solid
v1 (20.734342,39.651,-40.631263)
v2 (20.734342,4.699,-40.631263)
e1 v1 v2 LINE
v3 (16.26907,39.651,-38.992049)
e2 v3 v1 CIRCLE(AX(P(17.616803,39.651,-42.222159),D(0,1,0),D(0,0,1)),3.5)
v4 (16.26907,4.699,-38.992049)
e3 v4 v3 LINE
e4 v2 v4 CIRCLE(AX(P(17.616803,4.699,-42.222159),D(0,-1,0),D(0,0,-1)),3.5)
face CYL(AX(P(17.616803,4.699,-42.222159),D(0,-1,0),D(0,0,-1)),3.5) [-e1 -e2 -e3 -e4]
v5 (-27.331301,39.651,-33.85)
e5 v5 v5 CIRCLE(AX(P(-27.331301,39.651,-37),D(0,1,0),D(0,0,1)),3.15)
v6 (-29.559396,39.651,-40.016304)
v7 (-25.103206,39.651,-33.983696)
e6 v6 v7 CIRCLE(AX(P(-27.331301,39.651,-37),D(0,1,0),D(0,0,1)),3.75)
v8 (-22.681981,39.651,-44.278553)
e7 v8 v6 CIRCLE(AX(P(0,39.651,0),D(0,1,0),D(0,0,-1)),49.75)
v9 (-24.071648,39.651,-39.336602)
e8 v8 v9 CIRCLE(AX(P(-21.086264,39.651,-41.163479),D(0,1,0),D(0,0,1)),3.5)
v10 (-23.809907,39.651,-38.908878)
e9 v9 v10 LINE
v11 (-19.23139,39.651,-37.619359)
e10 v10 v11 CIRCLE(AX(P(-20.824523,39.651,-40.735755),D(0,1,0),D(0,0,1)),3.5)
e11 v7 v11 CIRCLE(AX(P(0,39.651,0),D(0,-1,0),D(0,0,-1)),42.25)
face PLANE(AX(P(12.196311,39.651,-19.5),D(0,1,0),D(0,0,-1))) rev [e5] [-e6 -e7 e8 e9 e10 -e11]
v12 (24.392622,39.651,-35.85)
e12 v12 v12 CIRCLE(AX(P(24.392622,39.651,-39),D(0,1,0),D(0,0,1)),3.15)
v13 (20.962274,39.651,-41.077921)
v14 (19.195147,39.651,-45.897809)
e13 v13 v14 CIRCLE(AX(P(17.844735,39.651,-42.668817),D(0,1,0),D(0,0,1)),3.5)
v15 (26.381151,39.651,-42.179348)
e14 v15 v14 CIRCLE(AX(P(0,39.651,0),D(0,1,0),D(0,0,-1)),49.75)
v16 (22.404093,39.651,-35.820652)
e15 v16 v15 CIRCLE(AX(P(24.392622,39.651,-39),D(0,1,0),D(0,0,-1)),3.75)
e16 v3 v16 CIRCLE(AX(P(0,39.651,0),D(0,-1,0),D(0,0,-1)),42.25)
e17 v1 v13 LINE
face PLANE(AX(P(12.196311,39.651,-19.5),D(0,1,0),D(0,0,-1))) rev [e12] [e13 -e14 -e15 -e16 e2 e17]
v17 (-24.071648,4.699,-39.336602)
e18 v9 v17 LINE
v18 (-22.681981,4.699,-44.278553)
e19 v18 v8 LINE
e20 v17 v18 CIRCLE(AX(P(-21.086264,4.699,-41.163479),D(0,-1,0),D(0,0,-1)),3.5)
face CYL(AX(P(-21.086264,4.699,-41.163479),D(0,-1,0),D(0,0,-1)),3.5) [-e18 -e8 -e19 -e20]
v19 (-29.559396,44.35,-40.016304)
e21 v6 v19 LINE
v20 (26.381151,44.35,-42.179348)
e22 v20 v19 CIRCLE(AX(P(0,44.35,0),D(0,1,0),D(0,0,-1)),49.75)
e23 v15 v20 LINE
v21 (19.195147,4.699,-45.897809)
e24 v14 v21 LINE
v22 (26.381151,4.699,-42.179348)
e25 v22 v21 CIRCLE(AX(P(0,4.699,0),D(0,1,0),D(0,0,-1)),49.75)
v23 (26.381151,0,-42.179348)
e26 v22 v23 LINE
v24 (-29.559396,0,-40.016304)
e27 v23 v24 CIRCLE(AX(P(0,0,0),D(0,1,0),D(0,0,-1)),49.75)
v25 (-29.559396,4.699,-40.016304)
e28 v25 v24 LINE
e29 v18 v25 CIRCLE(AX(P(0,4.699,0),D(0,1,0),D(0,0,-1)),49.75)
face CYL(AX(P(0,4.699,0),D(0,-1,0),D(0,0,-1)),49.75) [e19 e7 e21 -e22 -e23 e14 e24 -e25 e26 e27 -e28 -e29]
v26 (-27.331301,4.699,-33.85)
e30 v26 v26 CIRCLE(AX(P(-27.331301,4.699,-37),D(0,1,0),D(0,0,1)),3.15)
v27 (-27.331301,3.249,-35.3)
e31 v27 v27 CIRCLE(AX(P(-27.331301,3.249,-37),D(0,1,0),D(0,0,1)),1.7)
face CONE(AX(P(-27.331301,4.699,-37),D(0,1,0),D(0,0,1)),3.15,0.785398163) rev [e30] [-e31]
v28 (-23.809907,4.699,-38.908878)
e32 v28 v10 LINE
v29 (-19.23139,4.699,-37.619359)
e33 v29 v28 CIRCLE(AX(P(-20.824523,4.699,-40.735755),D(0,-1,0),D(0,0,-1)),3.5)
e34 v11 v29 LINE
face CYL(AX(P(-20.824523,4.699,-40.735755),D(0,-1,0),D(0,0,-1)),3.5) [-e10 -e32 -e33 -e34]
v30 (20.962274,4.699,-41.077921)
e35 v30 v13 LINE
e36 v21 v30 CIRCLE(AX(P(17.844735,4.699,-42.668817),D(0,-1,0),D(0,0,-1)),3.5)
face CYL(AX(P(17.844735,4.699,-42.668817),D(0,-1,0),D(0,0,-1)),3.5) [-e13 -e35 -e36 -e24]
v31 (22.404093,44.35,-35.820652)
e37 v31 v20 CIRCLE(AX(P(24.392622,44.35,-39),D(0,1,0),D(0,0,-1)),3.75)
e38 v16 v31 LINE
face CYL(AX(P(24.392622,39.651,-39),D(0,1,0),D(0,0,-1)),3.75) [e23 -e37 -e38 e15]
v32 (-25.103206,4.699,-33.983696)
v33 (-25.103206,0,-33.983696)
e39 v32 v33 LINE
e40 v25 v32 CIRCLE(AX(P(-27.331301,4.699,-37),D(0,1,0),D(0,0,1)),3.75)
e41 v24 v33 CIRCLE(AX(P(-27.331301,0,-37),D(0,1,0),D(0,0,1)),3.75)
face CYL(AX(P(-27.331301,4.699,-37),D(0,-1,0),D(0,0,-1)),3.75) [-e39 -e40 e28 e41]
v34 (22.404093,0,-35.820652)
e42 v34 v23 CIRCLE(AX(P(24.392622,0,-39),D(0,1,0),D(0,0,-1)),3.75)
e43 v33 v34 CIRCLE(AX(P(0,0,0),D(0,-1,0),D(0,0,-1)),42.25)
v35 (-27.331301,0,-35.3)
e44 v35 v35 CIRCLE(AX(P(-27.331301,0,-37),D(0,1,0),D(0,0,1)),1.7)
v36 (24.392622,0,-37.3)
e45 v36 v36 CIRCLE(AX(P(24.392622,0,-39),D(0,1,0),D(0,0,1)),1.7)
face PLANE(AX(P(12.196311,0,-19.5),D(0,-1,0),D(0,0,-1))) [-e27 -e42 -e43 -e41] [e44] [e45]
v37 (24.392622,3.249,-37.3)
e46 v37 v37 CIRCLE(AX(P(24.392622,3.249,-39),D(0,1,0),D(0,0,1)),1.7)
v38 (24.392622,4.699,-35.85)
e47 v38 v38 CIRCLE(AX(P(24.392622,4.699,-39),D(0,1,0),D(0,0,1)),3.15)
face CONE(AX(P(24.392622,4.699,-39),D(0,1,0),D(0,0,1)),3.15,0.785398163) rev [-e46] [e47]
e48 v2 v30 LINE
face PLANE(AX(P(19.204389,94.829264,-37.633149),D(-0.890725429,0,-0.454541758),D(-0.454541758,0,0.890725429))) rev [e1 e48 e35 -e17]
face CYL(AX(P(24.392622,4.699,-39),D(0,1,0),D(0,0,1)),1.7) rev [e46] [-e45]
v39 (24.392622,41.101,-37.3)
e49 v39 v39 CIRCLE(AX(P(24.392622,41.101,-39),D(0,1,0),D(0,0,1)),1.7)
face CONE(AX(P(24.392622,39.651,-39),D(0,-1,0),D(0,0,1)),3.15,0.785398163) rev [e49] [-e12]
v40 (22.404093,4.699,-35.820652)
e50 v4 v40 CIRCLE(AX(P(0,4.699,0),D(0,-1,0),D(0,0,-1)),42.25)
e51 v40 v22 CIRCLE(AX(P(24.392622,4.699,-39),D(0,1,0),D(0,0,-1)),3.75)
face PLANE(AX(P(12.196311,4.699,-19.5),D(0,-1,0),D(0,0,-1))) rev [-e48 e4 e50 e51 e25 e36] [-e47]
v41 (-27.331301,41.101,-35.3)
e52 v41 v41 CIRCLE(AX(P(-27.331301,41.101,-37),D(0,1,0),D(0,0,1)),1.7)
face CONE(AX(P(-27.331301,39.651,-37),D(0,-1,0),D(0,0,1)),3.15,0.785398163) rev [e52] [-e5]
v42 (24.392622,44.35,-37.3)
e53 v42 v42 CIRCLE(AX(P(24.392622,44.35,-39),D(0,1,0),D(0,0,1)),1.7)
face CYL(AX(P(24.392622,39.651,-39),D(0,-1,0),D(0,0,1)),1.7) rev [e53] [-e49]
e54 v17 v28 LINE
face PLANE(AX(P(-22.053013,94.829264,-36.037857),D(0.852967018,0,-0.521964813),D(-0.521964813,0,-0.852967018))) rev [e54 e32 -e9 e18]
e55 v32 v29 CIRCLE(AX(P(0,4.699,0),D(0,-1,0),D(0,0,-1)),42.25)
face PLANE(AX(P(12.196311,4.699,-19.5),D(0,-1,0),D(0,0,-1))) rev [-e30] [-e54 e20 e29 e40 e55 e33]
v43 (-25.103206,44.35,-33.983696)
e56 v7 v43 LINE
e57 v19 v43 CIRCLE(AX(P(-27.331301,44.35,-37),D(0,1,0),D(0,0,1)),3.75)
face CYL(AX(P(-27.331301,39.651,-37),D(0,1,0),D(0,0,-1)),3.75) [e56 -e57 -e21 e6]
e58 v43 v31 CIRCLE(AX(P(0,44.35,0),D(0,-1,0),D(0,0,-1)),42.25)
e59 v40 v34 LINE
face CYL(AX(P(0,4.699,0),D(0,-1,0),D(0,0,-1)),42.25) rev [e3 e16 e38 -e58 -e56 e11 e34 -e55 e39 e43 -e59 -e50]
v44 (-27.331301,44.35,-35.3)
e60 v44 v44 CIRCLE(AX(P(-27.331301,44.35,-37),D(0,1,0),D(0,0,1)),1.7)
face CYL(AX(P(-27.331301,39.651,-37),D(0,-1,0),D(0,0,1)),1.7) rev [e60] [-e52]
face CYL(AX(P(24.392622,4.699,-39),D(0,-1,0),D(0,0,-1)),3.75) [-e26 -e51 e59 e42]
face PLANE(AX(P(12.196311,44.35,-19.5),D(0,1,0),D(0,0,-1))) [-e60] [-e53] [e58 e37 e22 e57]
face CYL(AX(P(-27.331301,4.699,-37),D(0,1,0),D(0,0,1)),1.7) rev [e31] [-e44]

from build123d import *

# Parameters (mm, degrees)
BOSS_EXTRUDE1_DEPTH                             = 4.699
CSK_FOR_M3_FLAT_HEAD_MACHINE_SCREW1_D           = 3.4
CSK_FOR_M3_FLAT_HEAD_MACHINE_SCREW1_CSINK_D     = 6.3
CSK_FOR_M3_FLAT_HEAD_MACHINE_SCREW1_CSINK_ANGLE = 90
BOSS_EXTRUDE2_DEPTH                             = 17.476
FILLET1_R                                       = 3.5


# Read off the part's stored shape, not the designer's step: Mirror1
with BuildPart() as part:
    # Sketch1 → Boss-Extrude1 (new body)
    with BuildSketch(Plane(origin=(0, 0, 0), x_dir=(1, 0, 0), z_dir=(0, 1, 0))):
        with BuildLine():
            ThreePointArc((-29.559395906245367, 40.016304347826086), (-1.9222382209583215, 49.71285045359888), (26.381150789265686, 42.17934782608695))
            ThreePointArc((26.381150789265686, 42.17934782608695), (27.57196966138789, 37.011471046035254), (22.404092881336187, 35.82065217391305))
            ThreePointArc((22.404092881336187, 35.82065217391305), (-1.6324535645324438, 42.21845088772971), (-25.10320556862043, 33.983695652173914))
            ThreePointArc((-25.10320556862043, 33.983695652173914), (-30.347605085258984, 34.771904831187534), (-29.559395906245367, 40.016304347826086))
        make_face()
    extrude(amount=BOSS_EXTRUDE1_DEPTH)

    # CSK for M3 Flat Head Machine Screw1 (through all)
    with Locations(Plane(origin=(0, 4.699, 0), x_dir=(1, 0, 0), z_dir=(0, 1, 0))):
        with Locations((-27.331300737, 37), (24.392621835, 39)):
            CounterSinkHole(CSK_FOR_M3_FLAT_HEAD_MACHINE_SCREW1_D / 2, CSK_FOR_M3_FLAT_HEAD_MACHINE_SCREW1_CSINK_D / 2, counter_sink_angle=CSK_FOR_M3_FLAT_HEAD_MACHINE_SCREW1_CSINK_ANGLE)

    # Sketch4 → Boss-Extrude2 (add)
    with BuildSketch(Plane(origin=(0, 4.699, 0), x_dir=(1, 0, 0), z_dir=(0, 1, 0))):
        with BuildLine():
            Line((-22.05301335725447, 36.037856510408), (-25.967749456175376, 42.43510914539167))
            ThreePointArc((-25.967749456175376, 42.43510914539167), (-1.9222382209583215, 49.71285045359888), (22.613452452482438, 44.31359010709148))
            Line((22.613452452482438, 44.31359010709148), (19.204389268691116, 37.633149387429455))
            ThreePointArc((19.204389268691116, 37.633149387429455), (-1.6324535645324438, 42.21845088772971), (-22.05301335725447, 36.037856510408))
        make_face()
    extrude(amount=BOSS_EXTRUDE2_DEPTH)

    # Mirror1: part across plane


with BuildPart() as part_1:
    add(part.part)
    add(part.part.mirror(Plane(origin=(12.196310917650468, 22.175, -19.5), x_dir=(0, 0, 1), z_dir=(0, -1, 0))))

    # Fillet1
    fillet1_edges = [part_1.edges().sort_by_distance(p)[0] for p in [
        (19.204389268691116, 22.175000000000004, -37.633149387429455),
        (-22.053013357254475, 22.175, -36.037856510408005),
        (-25.967749456175373, 22.175000000000004, -42.43510914539168),
        (22.613452452482434, 22.175, -44.313590107091485),
    ]]
    fillet(fillet1_edges, radius=FILLET1_R)


solid = part_1.part
